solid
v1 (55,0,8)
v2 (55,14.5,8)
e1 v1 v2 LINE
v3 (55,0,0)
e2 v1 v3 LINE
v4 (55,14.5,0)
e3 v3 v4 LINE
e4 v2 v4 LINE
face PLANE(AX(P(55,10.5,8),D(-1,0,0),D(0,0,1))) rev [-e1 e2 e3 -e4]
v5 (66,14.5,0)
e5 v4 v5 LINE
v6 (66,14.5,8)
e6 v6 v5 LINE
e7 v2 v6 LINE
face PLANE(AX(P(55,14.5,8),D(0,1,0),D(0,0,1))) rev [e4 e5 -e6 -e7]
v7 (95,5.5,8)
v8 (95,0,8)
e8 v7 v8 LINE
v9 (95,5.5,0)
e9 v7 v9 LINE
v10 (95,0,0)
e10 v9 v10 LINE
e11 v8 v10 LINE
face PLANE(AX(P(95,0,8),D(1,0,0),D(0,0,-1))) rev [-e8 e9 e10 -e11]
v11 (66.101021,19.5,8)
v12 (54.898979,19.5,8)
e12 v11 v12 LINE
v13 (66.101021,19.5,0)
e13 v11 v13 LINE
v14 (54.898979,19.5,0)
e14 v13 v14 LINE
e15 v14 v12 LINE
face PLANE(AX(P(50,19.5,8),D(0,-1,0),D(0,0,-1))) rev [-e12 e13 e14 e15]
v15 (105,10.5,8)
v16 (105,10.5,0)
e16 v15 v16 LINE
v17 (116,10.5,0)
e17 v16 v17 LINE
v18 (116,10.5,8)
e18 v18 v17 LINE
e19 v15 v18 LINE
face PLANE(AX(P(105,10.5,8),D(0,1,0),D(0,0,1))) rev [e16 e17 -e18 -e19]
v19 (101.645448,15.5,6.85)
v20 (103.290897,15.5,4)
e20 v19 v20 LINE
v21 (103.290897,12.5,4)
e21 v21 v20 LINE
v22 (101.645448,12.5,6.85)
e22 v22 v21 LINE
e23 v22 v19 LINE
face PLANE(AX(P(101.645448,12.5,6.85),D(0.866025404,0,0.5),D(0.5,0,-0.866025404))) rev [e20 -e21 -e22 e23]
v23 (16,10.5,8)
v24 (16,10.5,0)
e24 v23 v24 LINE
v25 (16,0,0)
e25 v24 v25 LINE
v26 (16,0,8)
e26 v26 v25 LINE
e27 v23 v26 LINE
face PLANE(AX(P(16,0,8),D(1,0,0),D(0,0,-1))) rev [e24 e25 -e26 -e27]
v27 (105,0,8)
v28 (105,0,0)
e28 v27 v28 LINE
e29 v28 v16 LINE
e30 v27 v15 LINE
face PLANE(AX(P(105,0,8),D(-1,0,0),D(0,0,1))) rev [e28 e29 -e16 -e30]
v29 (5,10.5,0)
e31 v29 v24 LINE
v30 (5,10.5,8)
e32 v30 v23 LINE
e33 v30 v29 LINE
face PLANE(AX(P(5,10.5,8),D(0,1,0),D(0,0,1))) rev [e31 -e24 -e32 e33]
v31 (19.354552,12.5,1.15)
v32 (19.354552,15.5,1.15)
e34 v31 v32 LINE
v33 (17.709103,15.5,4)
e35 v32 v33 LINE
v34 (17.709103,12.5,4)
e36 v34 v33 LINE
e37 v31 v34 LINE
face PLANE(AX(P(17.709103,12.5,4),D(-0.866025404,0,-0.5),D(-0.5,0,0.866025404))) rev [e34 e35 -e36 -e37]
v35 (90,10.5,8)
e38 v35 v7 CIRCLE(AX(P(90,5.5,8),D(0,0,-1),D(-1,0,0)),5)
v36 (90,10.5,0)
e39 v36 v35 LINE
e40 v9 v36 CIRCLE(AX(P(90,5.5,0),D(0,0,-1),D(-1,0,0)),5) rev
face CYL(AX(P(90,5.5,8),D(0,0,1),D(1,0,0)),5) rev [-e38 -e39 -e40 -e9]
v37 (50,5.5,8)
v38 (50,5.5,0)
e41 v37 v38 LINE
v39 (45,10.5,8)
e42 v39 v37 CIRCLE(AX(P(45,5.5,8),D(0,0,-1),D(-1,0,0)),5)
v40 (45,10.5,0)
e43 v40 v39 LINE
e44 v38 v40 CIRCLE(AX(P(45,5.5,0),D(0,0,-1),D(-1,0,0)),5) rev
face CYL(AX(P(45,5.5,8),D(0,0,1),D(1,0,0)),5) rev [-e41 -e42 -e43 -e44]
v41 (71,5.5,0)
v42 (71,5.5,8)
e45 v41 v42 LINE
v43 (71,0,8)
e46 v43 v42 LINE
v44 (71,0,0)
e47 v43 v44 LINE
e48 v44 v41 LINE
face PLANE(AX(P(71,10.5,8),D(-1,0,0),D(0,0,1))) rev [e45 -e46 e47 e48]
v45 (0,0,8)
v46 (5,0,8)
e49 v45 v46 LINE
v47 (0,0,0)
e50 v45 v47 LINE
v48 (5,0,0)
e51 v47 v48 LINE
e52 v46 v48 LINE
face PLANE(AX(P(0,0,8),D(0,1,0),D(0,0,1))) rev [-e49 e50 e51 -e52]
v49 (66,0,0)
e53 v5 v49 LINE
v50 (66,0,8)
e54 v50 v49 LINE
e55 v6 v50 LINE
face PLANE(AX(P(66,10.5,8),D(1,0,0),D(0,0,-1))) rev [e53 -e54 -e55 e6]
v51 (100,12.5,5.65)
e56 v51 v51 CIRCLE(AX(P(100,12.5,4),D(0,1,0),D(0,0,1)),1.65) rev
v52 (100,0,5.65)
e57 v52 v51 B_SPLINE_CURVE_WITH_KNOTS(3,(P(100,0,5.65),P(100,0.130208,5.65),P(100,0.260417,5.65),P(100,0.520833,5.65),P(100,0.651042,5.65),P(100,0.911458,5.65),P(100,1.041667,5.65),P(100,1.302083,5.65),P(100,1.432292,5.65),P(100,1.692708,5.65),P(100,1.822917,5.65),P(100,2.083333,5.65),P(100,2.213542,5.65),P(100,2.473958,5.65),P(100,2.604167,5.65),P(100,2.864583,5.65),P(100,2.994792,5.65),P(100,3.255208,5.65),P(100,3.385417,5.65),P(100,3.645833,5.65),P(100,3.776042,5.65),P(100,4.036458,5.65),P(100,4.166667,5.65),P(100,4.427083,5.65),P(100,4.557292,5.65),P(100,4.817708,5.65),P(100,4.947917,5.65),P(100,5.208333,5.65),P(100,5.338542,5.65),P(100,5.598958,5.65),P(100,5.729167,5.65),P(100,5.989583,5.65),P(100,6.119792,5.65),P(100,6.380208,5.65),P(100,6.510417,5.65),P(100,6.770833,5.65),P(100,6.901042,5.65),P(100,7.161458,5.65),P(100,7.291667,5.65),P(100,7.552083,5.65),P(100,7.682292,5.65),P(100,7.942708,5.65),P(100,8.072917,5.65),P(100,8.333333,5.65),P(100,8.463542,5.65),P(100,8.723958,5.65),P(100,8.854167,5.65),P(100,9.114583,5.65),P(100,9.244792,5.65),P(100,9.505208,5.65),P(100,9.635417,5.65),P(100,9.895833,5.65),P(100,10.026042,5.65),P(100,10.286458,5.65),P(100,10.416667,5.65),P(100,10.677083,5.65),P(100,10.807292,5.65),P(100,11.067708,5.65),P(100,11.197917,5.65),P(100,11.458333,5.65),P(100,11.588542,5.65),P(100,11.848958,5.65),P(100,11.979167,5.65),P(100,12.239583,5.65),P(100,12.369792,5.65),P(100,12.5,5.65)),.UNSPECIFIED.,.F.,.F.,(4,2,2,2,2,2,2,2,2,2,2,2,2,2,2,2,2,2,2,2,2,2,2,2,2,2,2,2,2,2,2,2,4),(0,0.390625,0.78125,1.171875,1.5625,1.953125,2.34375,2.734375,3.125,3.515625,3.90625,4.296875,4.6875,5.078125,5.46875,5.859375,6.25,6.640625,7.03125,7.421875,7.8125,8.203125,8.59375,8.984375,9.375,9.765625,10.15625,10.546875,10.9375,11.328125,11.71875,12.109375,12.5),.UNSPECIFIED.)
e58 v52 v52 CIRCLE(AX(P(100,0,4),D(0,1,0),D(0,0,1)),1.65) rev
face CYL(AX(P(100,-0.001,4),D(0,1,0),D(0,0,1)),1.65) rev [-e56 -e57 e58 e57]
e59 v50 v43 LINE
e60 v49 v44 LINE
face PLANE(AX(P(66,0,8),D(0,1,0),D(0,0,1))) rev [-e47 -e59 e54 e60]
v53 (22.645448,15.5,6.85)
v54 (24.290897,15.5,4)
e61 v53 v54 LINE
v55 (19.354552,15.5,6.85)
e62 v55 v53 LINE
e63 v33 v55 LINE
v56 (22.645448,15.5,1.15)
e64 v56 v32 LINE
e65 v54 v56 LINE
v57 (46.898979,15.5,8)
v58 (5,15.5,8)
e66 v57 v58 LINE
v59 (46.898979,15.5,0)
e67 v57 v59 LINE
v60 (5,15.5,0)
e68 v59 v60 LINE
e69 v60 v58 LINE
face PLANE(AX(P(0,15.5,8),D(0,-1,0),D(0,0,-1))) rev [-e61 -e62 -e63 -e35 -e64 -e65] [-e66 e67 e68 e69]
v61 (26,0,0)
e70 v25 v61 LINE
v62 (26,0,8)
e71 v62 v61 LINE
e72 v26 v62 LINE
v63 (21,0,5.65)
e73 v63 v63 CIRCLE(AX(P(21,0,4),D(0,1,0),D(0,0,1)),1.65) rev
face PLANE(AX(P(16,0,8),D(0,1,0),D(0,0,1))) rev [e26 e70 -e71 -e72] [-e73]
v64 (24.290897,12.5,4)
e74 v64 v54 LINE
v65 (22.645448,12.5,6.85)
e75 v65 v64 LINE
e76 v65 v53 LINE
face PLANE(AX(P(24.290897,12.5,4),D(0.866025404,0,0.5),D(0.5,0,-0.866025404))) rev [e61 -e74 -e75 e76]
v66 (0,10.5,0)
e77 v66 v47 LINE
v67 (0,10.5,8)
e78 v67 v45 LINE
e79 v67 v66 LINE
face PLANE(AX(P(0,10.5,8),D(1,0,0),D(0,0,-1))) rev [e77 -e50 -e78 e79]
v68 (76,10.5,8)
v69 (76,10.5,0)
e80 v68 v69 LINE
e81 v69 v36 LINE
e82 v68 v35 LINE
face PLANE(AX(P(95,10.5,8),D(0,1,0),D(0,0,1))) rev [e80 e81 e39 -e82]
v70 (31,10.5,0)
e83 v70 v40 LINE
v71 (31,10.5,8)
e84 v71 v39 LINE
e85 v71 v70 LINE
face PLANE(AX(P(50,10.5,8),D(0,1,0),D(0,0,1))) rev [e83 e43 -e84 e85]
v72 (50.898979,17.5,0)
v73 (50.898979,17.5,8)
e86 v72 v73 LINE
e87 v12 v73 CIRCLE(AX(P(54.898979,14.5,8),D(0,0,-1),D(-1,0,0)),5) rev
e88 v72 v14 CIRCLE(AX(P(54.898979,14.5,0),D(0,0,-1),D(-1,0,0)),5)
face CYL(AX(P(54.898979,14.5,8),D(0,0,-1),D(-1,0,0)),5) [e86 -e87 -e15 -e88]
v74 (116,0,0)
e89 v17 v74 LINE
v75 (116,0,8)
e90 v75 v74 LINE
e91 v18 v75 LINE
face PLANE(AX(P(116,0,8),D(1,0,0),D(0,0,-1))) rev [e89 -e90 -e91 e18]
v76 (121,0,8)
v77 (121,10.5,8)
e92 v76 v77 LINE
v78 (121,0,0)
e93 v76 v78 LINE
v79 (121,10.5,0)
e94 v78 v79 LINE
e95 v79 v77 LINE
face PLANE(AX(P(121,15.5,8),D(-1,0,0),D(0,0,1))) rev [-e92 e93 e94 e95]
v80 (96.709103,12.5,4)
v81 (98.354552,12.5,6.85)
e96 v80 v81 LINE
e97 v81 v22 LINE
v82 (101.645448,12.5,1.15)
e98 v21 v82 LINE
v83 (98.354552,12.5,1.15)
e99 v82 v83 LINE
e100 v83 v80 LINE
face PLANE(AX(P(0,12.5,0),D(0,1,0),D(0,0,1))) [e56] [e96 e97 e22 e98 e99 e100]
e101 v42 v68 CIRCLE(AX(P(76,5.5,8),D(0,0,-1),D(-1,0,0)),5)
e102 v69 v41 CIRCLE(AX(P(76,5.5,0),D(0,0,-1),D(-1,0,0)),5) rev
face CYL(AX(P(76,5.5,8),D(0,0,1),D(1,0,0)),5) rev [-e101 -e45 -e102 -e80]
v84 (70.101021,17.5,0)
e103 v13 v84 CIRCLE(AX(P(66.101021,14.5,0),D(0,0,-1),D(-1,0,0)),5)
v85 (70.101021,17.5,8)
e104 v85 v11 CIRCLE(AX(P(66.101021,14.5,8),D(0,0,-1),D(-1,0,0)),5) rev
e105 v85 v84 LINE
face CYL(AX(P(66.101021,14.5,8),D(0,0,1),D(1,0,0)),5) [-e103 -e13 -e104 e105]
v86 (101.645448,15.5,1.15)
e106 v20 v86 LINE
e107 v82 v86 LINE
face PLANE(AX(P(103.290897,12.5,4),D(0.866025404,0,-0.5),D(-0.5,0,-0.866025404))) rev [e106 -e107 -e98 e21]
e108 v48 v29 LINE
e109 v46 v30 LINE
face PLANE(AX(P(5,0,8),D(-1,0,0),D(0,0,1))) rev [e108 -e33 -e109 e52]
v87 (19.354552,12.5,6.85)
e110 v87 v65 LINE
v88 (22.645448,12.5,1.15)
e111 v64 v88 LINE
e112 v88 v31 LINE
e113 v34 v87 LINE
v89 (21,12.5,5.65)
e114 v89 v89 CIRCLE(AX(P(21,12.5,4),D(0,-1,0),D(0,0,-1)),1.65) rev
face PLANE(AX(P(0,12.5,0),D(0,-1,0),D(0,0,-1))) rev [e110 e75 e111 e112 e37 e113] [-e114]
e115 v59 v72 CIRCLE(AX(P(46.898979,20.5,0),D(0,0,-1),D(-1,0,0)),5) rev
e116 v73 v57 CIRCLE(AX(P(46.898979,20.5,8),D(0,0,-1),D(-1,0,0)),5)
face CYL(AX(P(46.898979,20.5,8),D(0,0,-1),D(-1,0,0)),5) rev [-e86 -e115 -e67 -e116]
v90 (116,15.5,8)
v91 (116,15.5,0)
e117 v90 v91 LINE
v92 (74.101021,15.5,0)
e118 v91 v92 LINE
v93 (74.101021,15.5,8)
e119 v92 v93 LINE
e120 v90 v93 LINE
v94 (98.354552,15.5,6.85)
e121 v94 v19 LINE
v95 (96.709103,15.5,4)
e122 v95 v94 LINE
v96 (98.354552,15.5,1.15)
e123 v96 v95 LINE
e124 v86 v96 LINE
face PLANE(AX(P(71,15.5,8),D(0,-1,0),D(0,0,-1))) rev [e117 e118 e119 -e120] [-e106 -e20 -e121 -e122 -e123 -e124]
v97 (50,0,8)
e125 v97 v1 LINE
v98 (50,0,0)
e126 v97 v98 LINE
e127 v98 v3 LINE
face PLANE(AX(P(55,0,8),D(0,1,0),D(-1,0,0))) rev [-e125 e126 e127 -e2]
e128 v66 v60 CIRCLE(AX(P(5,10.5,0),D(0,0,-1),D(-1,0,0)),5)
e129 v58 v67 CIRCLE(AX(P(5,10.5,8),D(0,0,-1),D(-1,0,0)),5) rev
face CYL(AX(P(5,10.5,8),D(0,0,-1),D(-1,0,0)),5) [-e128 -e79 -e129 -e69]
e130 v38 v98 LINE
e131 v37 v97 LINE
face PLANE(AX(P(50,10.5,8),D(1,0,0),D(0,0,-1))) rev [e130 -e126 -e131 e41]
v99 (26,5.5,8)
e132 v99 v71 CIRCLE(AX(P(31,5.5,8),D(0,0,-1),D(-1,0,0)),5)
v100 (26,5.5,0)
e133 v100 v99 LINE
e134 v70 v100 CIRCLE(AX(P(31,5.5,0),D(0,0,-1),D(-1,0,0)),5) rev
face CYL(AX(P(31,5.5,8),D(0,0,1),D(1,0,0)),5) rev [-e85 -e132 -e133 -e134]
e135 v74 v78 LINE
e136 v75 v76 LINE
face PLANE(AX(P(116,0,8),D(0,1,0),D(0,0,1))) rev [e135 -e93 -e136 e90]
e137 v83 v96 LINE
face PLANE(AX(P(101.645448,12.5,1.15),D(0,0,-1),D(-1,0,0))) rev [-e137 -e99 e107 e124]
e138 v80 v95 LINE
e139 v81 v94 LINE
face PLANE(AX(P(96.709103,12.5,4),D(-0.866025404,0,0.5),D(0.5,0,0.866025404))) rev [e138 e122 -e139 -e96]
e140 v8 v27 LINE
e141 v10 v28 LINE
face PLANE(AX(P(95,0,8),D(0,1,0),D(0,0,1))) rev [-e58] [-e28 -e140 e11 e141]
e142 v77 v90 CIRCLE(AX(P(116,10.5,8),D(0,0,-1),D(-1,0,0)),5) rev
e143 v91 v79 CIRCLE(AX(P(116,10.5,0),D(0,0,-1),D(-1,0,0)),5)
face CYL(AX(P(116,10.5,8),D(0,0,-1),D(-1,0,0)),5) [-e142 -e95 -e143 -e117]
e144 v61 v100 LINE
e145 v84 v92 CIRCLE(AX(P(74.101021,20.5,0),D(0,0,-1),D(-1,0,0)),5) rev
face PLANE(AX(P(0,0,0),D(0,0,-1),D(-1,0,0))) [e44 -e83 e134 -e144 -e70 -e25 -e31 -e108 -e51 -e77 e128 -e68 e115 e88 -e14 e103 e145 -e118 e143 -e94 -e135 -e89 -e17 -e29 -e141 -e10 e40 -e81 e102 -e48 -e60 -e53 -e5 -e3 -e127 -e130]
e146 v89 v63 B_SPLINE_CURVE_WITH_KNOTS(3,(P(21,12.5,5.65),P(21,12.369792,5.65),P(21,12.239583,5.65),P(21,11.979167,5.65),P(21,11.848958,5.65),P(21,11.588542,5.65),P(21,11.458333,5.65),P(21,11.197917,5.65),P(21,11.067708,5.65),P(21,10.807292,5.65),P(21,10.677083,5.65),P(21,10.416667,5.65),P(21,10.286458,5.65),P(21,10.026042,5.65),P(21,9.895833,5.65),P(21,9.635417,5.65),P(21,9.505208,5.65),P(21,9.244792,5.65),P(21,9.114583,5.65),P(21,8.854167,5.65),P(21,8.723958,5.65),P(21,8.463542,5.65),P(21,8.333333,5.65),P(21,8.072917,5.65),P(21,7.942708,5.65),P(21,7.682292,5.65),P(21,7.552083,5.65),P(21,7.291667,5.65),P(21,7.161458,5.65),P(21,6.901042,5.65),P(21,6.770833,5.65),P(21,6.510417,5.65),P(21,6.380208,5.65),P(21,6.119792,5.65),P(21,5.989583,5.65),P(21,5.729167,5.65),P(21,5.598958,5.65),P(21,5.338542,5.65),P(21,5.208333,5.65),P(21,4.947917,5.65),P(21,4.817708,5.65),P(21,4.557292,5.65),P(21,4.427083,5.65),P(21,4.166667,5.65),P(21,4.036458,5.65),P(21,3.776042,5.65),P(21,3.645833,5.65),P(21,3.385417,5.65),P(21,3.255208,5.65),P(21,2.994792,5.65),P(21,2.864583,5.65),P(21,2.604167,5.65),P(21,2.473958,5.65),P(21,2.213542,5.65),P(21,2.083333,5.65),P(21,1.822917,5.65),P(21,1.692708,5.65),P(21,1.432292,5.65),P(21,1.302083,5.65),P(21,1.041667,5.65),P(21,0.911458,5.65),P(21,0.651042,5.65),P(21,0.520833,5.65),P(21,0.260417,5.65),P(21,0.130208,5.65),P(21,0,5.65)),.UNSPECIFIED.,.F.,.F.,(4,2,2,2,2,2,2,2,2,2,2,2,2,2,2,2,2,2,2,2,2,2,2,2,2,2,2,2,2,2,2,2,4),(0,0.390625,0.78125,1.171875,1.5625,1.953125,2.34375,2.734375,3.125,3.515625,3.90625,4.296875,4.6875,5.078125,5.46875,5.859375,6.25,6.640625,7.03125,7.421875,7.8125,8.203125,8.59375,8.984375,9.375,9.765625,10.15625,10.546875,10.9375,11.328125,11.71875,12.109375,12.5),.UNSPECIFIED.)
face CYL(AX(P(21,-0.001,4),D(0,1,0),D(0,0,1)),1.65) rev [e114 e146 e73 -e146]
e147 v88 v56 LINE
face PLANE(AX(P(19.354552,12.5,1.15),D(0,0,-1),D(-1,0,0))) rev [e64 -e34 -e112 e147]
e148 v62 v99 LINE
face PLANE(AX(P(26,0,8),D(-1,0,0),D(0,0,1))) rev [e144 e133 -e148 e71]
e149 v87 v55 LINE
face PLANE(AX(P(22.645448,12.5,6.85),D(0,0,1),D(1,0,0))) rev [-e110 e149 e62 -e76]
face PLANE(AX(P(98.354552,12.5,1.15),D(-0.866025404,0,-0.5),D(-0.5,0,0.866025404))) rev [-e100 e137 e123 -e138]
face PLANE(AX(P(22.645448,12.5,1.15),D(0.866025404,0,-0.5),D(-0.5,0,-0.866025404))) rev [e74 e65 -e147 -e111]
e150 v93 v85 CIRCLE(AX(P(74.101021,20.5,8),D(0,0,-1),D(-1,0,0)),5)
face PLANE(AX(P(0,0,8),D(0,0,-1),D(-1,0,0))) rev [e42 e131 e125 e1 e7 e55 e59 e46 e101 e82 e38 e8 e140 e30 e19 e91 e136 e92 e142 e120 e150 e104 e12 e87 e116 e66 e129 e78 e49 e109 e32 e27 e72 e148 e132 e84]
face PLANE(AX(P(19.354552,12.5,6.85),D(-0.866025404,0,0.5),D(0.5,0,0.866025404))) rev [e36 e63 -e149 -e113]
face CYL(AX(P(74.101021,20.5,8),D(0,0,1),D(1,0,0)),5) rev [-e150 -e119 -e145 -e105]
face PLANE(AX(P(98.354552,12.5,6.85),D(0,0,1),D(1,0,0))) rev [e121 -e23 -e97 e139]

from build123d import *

# Parameters (mm, degrees)
BOSS_EXTRU_1_DEPTH      = 8
ENL_V_MAT_EXTRU_1_REACH = 124.251
ESQUISSE2_R             = 1.65
CONG_1_R                = 5
ENL_V_MAT_EXTRU_2_DEPTH = 3
CONG_2_R                = 5
CONG_3_R                = 5
CONG_4_R                = 5


with BuildPart() as part:
    # Esquisse1 → Boss.-Extru.1 (new body)
    with BuildSketch(Plane.XY):
        Polygon((0, 10.5), (0, 15.5), (50, 15.5), (50, 19.5), (71, 19.5), (71, 15.5), (121, 15.5), (121, 10.5), (121, 0), (116, 0), (116, 10.5), (105, 10.5), (105, 0), (95, 0), (95, 10.5), (71, 10.5), (71, 0), (66, 0), (66, 10.5), (66, 14.5), (55, 14.5), (55, 10.5), (55, 0), (50, 0), (50, 10.5), (26, 10.5), (26, 0), (16, 0), (16, 10.5), (5, 10.5), (5, 0), (0, 0), align=None)
    extrude(amount=BOSS_EXTRU_1_DEPTH)

    # Esquisse2 → Enlèv. mat.-Extru.1 (cut, up to next)
    with BuildSketch(Plane(origin=(0, 15.5, 0), x_dir=(1, 0, 0), z_dir=(0, 1, 0)), mode=Mode.PRIVATE) as enl_v_mat_extru_1_sk1:
        with Locations(Location((21, -4, 0), (0, 0, 270))):
            Circle(ESQUISSE2_R)
    enl_v_mat_extru_1_tool1 = extrude(enl_v_mat_extru_1_sk1.sketch, amount=-ENL_V_MAT_EXTRU_1_REACH, mode=Mode.PRIVATE) & part.part
    # Esquisse2 → Enlèv. mat.-Extru.1 (cut, up to next)
    with BuildSketch(Plane(origin=(0, 15.5, 0), x_dir=(1, 0, 0), z_dir=(0, 1, 0)), mode=Mode.PRIVATE) as enl_v_mat_extru_1_sk2:
        with Locations(Location((100, -4, 0), (0, 0, 270))):
            Circle(ESQUISSE2_R)
    enl_v_mat_extru_1_tool2 = extrude(enl_v_mat_extru_1_sk2.sketch, amount=-ENL_V_MAT_EXTRU_1_REACH, mode=Mode.PRIVATE) & part.part
    add(enl_v_mat_extru_1_tool1.solids().sort_by_distance((21, 15.5, 4))[0], mode=Mode.SUBTRACT)
    add(enl_v_mat_extru_1_tool2.solids().sort_by_distance((100, 15.5, 4))[0], mode=Mode.SUBTRACT)

    # Congé1
    # the kernel refuses this fillet: 5 mm, written as the material it takes off along each edge
    with BuildSketch(Plane(origin=(50, 19.5, -12.247448714), x_dir=(1.568523089189919e-12, -1.0, 0), z_dir=(0, 0, 1))) as cong_1_piece_1:
        with BuildLine():
            CenterArc((5, 4.898979486), CONG_1_R, 180, 78.463040967)
            Line((0, 4.898979486), (-0.1, 4.898979486))
            Line((-0.1, 4.898979486), (-0.1, 0))
            Line((-0.1, 0), (0, -0.1))
            ThreePointArc((0, -0.1), (2, -0.1), (3.98, -0.09797959))
            Line((3.98, -0.09797959), (4, 0))
        make_face()
    extrude(amount=32.494897428, mode=Mode.SUBTRACT)
    with BuildSketch(Plane(origin=(71, 19.5, -12.247448714), x_dir=(-1, 0, 0), z_dir=(0, 0, 1))) as cong_1_piece_2:
        with BuildLine():
            CenterArc((4.898979486, 5), CONG_1_R, 191.536959033, 78.463040967)
            Line((0, 4), (-0.09797959, 3.98))
            ThreePointArc((-0.09797959, 3.98), (-0.1, 2), (-0.1, 0))
            Line((-0.1, 0), (0, -0.1))
            Line((0, -0.1), (4.898979486, -0.1))
            Line((4.898979486, -0.1), (4.898979486, 0))
        make_face()
    extrude(amount=32.494897428, mode=Mode.SUBTRACT)

    # Esquisse3 → Enlèv. mat.-Extru.2 (cut)
    with BuildSketch(Plane(origin=(0, 15.5, 0), x_dir=(1, 0, 0), z_dir=(0, 1, 0))):
        Polygon((19.354551733, -1.15), (22.645448267, -1.15), (24.290896534, -4), (22.645448267, -6.85), (19.354551733, -6.85), (17.709103466, -4), align=None)
        Polygon((103.290896534, -4), (101.645448267, -1.15), (98.354551733, -1.15), (96.709103466, -4), (98.354551733, -6.85), (101.645448267, -6.85), align=None)
    extrude(amount=-ENL_V_MAT_EXTRU_2_DEPTH, mode=Mode.SUBTRACT)

    # Congé2
    cong_2_edges = [part.edges().sort_by_distance(p)[0] for p in [
        (0, 15.5, 4),
        (121, 15.5, 4),
    ]]
    fillet(cong_2_edges, radius=CONG_2_R)

    # Congé3
    cong_3_edges = [part.edges().sort_by_distance(p)[0] for p in [
        (95, 10.5, 4),
        (71, 10.5, 4),
        (50, 10.5, 4),
        (26, 10.5, 4),
    ]]
    fillet(cong_3_edges, radius=CONG_3_R)

    # Congé4
    cong_4_edges = [part.edges().sort_by_distance(p)[0] for p in [
        (50, 15.5, 4),
        (71, 15.5, 4),
    ]]
    fillet(cong_4_edges, radius=CONG_4_R)


solid = part.part
